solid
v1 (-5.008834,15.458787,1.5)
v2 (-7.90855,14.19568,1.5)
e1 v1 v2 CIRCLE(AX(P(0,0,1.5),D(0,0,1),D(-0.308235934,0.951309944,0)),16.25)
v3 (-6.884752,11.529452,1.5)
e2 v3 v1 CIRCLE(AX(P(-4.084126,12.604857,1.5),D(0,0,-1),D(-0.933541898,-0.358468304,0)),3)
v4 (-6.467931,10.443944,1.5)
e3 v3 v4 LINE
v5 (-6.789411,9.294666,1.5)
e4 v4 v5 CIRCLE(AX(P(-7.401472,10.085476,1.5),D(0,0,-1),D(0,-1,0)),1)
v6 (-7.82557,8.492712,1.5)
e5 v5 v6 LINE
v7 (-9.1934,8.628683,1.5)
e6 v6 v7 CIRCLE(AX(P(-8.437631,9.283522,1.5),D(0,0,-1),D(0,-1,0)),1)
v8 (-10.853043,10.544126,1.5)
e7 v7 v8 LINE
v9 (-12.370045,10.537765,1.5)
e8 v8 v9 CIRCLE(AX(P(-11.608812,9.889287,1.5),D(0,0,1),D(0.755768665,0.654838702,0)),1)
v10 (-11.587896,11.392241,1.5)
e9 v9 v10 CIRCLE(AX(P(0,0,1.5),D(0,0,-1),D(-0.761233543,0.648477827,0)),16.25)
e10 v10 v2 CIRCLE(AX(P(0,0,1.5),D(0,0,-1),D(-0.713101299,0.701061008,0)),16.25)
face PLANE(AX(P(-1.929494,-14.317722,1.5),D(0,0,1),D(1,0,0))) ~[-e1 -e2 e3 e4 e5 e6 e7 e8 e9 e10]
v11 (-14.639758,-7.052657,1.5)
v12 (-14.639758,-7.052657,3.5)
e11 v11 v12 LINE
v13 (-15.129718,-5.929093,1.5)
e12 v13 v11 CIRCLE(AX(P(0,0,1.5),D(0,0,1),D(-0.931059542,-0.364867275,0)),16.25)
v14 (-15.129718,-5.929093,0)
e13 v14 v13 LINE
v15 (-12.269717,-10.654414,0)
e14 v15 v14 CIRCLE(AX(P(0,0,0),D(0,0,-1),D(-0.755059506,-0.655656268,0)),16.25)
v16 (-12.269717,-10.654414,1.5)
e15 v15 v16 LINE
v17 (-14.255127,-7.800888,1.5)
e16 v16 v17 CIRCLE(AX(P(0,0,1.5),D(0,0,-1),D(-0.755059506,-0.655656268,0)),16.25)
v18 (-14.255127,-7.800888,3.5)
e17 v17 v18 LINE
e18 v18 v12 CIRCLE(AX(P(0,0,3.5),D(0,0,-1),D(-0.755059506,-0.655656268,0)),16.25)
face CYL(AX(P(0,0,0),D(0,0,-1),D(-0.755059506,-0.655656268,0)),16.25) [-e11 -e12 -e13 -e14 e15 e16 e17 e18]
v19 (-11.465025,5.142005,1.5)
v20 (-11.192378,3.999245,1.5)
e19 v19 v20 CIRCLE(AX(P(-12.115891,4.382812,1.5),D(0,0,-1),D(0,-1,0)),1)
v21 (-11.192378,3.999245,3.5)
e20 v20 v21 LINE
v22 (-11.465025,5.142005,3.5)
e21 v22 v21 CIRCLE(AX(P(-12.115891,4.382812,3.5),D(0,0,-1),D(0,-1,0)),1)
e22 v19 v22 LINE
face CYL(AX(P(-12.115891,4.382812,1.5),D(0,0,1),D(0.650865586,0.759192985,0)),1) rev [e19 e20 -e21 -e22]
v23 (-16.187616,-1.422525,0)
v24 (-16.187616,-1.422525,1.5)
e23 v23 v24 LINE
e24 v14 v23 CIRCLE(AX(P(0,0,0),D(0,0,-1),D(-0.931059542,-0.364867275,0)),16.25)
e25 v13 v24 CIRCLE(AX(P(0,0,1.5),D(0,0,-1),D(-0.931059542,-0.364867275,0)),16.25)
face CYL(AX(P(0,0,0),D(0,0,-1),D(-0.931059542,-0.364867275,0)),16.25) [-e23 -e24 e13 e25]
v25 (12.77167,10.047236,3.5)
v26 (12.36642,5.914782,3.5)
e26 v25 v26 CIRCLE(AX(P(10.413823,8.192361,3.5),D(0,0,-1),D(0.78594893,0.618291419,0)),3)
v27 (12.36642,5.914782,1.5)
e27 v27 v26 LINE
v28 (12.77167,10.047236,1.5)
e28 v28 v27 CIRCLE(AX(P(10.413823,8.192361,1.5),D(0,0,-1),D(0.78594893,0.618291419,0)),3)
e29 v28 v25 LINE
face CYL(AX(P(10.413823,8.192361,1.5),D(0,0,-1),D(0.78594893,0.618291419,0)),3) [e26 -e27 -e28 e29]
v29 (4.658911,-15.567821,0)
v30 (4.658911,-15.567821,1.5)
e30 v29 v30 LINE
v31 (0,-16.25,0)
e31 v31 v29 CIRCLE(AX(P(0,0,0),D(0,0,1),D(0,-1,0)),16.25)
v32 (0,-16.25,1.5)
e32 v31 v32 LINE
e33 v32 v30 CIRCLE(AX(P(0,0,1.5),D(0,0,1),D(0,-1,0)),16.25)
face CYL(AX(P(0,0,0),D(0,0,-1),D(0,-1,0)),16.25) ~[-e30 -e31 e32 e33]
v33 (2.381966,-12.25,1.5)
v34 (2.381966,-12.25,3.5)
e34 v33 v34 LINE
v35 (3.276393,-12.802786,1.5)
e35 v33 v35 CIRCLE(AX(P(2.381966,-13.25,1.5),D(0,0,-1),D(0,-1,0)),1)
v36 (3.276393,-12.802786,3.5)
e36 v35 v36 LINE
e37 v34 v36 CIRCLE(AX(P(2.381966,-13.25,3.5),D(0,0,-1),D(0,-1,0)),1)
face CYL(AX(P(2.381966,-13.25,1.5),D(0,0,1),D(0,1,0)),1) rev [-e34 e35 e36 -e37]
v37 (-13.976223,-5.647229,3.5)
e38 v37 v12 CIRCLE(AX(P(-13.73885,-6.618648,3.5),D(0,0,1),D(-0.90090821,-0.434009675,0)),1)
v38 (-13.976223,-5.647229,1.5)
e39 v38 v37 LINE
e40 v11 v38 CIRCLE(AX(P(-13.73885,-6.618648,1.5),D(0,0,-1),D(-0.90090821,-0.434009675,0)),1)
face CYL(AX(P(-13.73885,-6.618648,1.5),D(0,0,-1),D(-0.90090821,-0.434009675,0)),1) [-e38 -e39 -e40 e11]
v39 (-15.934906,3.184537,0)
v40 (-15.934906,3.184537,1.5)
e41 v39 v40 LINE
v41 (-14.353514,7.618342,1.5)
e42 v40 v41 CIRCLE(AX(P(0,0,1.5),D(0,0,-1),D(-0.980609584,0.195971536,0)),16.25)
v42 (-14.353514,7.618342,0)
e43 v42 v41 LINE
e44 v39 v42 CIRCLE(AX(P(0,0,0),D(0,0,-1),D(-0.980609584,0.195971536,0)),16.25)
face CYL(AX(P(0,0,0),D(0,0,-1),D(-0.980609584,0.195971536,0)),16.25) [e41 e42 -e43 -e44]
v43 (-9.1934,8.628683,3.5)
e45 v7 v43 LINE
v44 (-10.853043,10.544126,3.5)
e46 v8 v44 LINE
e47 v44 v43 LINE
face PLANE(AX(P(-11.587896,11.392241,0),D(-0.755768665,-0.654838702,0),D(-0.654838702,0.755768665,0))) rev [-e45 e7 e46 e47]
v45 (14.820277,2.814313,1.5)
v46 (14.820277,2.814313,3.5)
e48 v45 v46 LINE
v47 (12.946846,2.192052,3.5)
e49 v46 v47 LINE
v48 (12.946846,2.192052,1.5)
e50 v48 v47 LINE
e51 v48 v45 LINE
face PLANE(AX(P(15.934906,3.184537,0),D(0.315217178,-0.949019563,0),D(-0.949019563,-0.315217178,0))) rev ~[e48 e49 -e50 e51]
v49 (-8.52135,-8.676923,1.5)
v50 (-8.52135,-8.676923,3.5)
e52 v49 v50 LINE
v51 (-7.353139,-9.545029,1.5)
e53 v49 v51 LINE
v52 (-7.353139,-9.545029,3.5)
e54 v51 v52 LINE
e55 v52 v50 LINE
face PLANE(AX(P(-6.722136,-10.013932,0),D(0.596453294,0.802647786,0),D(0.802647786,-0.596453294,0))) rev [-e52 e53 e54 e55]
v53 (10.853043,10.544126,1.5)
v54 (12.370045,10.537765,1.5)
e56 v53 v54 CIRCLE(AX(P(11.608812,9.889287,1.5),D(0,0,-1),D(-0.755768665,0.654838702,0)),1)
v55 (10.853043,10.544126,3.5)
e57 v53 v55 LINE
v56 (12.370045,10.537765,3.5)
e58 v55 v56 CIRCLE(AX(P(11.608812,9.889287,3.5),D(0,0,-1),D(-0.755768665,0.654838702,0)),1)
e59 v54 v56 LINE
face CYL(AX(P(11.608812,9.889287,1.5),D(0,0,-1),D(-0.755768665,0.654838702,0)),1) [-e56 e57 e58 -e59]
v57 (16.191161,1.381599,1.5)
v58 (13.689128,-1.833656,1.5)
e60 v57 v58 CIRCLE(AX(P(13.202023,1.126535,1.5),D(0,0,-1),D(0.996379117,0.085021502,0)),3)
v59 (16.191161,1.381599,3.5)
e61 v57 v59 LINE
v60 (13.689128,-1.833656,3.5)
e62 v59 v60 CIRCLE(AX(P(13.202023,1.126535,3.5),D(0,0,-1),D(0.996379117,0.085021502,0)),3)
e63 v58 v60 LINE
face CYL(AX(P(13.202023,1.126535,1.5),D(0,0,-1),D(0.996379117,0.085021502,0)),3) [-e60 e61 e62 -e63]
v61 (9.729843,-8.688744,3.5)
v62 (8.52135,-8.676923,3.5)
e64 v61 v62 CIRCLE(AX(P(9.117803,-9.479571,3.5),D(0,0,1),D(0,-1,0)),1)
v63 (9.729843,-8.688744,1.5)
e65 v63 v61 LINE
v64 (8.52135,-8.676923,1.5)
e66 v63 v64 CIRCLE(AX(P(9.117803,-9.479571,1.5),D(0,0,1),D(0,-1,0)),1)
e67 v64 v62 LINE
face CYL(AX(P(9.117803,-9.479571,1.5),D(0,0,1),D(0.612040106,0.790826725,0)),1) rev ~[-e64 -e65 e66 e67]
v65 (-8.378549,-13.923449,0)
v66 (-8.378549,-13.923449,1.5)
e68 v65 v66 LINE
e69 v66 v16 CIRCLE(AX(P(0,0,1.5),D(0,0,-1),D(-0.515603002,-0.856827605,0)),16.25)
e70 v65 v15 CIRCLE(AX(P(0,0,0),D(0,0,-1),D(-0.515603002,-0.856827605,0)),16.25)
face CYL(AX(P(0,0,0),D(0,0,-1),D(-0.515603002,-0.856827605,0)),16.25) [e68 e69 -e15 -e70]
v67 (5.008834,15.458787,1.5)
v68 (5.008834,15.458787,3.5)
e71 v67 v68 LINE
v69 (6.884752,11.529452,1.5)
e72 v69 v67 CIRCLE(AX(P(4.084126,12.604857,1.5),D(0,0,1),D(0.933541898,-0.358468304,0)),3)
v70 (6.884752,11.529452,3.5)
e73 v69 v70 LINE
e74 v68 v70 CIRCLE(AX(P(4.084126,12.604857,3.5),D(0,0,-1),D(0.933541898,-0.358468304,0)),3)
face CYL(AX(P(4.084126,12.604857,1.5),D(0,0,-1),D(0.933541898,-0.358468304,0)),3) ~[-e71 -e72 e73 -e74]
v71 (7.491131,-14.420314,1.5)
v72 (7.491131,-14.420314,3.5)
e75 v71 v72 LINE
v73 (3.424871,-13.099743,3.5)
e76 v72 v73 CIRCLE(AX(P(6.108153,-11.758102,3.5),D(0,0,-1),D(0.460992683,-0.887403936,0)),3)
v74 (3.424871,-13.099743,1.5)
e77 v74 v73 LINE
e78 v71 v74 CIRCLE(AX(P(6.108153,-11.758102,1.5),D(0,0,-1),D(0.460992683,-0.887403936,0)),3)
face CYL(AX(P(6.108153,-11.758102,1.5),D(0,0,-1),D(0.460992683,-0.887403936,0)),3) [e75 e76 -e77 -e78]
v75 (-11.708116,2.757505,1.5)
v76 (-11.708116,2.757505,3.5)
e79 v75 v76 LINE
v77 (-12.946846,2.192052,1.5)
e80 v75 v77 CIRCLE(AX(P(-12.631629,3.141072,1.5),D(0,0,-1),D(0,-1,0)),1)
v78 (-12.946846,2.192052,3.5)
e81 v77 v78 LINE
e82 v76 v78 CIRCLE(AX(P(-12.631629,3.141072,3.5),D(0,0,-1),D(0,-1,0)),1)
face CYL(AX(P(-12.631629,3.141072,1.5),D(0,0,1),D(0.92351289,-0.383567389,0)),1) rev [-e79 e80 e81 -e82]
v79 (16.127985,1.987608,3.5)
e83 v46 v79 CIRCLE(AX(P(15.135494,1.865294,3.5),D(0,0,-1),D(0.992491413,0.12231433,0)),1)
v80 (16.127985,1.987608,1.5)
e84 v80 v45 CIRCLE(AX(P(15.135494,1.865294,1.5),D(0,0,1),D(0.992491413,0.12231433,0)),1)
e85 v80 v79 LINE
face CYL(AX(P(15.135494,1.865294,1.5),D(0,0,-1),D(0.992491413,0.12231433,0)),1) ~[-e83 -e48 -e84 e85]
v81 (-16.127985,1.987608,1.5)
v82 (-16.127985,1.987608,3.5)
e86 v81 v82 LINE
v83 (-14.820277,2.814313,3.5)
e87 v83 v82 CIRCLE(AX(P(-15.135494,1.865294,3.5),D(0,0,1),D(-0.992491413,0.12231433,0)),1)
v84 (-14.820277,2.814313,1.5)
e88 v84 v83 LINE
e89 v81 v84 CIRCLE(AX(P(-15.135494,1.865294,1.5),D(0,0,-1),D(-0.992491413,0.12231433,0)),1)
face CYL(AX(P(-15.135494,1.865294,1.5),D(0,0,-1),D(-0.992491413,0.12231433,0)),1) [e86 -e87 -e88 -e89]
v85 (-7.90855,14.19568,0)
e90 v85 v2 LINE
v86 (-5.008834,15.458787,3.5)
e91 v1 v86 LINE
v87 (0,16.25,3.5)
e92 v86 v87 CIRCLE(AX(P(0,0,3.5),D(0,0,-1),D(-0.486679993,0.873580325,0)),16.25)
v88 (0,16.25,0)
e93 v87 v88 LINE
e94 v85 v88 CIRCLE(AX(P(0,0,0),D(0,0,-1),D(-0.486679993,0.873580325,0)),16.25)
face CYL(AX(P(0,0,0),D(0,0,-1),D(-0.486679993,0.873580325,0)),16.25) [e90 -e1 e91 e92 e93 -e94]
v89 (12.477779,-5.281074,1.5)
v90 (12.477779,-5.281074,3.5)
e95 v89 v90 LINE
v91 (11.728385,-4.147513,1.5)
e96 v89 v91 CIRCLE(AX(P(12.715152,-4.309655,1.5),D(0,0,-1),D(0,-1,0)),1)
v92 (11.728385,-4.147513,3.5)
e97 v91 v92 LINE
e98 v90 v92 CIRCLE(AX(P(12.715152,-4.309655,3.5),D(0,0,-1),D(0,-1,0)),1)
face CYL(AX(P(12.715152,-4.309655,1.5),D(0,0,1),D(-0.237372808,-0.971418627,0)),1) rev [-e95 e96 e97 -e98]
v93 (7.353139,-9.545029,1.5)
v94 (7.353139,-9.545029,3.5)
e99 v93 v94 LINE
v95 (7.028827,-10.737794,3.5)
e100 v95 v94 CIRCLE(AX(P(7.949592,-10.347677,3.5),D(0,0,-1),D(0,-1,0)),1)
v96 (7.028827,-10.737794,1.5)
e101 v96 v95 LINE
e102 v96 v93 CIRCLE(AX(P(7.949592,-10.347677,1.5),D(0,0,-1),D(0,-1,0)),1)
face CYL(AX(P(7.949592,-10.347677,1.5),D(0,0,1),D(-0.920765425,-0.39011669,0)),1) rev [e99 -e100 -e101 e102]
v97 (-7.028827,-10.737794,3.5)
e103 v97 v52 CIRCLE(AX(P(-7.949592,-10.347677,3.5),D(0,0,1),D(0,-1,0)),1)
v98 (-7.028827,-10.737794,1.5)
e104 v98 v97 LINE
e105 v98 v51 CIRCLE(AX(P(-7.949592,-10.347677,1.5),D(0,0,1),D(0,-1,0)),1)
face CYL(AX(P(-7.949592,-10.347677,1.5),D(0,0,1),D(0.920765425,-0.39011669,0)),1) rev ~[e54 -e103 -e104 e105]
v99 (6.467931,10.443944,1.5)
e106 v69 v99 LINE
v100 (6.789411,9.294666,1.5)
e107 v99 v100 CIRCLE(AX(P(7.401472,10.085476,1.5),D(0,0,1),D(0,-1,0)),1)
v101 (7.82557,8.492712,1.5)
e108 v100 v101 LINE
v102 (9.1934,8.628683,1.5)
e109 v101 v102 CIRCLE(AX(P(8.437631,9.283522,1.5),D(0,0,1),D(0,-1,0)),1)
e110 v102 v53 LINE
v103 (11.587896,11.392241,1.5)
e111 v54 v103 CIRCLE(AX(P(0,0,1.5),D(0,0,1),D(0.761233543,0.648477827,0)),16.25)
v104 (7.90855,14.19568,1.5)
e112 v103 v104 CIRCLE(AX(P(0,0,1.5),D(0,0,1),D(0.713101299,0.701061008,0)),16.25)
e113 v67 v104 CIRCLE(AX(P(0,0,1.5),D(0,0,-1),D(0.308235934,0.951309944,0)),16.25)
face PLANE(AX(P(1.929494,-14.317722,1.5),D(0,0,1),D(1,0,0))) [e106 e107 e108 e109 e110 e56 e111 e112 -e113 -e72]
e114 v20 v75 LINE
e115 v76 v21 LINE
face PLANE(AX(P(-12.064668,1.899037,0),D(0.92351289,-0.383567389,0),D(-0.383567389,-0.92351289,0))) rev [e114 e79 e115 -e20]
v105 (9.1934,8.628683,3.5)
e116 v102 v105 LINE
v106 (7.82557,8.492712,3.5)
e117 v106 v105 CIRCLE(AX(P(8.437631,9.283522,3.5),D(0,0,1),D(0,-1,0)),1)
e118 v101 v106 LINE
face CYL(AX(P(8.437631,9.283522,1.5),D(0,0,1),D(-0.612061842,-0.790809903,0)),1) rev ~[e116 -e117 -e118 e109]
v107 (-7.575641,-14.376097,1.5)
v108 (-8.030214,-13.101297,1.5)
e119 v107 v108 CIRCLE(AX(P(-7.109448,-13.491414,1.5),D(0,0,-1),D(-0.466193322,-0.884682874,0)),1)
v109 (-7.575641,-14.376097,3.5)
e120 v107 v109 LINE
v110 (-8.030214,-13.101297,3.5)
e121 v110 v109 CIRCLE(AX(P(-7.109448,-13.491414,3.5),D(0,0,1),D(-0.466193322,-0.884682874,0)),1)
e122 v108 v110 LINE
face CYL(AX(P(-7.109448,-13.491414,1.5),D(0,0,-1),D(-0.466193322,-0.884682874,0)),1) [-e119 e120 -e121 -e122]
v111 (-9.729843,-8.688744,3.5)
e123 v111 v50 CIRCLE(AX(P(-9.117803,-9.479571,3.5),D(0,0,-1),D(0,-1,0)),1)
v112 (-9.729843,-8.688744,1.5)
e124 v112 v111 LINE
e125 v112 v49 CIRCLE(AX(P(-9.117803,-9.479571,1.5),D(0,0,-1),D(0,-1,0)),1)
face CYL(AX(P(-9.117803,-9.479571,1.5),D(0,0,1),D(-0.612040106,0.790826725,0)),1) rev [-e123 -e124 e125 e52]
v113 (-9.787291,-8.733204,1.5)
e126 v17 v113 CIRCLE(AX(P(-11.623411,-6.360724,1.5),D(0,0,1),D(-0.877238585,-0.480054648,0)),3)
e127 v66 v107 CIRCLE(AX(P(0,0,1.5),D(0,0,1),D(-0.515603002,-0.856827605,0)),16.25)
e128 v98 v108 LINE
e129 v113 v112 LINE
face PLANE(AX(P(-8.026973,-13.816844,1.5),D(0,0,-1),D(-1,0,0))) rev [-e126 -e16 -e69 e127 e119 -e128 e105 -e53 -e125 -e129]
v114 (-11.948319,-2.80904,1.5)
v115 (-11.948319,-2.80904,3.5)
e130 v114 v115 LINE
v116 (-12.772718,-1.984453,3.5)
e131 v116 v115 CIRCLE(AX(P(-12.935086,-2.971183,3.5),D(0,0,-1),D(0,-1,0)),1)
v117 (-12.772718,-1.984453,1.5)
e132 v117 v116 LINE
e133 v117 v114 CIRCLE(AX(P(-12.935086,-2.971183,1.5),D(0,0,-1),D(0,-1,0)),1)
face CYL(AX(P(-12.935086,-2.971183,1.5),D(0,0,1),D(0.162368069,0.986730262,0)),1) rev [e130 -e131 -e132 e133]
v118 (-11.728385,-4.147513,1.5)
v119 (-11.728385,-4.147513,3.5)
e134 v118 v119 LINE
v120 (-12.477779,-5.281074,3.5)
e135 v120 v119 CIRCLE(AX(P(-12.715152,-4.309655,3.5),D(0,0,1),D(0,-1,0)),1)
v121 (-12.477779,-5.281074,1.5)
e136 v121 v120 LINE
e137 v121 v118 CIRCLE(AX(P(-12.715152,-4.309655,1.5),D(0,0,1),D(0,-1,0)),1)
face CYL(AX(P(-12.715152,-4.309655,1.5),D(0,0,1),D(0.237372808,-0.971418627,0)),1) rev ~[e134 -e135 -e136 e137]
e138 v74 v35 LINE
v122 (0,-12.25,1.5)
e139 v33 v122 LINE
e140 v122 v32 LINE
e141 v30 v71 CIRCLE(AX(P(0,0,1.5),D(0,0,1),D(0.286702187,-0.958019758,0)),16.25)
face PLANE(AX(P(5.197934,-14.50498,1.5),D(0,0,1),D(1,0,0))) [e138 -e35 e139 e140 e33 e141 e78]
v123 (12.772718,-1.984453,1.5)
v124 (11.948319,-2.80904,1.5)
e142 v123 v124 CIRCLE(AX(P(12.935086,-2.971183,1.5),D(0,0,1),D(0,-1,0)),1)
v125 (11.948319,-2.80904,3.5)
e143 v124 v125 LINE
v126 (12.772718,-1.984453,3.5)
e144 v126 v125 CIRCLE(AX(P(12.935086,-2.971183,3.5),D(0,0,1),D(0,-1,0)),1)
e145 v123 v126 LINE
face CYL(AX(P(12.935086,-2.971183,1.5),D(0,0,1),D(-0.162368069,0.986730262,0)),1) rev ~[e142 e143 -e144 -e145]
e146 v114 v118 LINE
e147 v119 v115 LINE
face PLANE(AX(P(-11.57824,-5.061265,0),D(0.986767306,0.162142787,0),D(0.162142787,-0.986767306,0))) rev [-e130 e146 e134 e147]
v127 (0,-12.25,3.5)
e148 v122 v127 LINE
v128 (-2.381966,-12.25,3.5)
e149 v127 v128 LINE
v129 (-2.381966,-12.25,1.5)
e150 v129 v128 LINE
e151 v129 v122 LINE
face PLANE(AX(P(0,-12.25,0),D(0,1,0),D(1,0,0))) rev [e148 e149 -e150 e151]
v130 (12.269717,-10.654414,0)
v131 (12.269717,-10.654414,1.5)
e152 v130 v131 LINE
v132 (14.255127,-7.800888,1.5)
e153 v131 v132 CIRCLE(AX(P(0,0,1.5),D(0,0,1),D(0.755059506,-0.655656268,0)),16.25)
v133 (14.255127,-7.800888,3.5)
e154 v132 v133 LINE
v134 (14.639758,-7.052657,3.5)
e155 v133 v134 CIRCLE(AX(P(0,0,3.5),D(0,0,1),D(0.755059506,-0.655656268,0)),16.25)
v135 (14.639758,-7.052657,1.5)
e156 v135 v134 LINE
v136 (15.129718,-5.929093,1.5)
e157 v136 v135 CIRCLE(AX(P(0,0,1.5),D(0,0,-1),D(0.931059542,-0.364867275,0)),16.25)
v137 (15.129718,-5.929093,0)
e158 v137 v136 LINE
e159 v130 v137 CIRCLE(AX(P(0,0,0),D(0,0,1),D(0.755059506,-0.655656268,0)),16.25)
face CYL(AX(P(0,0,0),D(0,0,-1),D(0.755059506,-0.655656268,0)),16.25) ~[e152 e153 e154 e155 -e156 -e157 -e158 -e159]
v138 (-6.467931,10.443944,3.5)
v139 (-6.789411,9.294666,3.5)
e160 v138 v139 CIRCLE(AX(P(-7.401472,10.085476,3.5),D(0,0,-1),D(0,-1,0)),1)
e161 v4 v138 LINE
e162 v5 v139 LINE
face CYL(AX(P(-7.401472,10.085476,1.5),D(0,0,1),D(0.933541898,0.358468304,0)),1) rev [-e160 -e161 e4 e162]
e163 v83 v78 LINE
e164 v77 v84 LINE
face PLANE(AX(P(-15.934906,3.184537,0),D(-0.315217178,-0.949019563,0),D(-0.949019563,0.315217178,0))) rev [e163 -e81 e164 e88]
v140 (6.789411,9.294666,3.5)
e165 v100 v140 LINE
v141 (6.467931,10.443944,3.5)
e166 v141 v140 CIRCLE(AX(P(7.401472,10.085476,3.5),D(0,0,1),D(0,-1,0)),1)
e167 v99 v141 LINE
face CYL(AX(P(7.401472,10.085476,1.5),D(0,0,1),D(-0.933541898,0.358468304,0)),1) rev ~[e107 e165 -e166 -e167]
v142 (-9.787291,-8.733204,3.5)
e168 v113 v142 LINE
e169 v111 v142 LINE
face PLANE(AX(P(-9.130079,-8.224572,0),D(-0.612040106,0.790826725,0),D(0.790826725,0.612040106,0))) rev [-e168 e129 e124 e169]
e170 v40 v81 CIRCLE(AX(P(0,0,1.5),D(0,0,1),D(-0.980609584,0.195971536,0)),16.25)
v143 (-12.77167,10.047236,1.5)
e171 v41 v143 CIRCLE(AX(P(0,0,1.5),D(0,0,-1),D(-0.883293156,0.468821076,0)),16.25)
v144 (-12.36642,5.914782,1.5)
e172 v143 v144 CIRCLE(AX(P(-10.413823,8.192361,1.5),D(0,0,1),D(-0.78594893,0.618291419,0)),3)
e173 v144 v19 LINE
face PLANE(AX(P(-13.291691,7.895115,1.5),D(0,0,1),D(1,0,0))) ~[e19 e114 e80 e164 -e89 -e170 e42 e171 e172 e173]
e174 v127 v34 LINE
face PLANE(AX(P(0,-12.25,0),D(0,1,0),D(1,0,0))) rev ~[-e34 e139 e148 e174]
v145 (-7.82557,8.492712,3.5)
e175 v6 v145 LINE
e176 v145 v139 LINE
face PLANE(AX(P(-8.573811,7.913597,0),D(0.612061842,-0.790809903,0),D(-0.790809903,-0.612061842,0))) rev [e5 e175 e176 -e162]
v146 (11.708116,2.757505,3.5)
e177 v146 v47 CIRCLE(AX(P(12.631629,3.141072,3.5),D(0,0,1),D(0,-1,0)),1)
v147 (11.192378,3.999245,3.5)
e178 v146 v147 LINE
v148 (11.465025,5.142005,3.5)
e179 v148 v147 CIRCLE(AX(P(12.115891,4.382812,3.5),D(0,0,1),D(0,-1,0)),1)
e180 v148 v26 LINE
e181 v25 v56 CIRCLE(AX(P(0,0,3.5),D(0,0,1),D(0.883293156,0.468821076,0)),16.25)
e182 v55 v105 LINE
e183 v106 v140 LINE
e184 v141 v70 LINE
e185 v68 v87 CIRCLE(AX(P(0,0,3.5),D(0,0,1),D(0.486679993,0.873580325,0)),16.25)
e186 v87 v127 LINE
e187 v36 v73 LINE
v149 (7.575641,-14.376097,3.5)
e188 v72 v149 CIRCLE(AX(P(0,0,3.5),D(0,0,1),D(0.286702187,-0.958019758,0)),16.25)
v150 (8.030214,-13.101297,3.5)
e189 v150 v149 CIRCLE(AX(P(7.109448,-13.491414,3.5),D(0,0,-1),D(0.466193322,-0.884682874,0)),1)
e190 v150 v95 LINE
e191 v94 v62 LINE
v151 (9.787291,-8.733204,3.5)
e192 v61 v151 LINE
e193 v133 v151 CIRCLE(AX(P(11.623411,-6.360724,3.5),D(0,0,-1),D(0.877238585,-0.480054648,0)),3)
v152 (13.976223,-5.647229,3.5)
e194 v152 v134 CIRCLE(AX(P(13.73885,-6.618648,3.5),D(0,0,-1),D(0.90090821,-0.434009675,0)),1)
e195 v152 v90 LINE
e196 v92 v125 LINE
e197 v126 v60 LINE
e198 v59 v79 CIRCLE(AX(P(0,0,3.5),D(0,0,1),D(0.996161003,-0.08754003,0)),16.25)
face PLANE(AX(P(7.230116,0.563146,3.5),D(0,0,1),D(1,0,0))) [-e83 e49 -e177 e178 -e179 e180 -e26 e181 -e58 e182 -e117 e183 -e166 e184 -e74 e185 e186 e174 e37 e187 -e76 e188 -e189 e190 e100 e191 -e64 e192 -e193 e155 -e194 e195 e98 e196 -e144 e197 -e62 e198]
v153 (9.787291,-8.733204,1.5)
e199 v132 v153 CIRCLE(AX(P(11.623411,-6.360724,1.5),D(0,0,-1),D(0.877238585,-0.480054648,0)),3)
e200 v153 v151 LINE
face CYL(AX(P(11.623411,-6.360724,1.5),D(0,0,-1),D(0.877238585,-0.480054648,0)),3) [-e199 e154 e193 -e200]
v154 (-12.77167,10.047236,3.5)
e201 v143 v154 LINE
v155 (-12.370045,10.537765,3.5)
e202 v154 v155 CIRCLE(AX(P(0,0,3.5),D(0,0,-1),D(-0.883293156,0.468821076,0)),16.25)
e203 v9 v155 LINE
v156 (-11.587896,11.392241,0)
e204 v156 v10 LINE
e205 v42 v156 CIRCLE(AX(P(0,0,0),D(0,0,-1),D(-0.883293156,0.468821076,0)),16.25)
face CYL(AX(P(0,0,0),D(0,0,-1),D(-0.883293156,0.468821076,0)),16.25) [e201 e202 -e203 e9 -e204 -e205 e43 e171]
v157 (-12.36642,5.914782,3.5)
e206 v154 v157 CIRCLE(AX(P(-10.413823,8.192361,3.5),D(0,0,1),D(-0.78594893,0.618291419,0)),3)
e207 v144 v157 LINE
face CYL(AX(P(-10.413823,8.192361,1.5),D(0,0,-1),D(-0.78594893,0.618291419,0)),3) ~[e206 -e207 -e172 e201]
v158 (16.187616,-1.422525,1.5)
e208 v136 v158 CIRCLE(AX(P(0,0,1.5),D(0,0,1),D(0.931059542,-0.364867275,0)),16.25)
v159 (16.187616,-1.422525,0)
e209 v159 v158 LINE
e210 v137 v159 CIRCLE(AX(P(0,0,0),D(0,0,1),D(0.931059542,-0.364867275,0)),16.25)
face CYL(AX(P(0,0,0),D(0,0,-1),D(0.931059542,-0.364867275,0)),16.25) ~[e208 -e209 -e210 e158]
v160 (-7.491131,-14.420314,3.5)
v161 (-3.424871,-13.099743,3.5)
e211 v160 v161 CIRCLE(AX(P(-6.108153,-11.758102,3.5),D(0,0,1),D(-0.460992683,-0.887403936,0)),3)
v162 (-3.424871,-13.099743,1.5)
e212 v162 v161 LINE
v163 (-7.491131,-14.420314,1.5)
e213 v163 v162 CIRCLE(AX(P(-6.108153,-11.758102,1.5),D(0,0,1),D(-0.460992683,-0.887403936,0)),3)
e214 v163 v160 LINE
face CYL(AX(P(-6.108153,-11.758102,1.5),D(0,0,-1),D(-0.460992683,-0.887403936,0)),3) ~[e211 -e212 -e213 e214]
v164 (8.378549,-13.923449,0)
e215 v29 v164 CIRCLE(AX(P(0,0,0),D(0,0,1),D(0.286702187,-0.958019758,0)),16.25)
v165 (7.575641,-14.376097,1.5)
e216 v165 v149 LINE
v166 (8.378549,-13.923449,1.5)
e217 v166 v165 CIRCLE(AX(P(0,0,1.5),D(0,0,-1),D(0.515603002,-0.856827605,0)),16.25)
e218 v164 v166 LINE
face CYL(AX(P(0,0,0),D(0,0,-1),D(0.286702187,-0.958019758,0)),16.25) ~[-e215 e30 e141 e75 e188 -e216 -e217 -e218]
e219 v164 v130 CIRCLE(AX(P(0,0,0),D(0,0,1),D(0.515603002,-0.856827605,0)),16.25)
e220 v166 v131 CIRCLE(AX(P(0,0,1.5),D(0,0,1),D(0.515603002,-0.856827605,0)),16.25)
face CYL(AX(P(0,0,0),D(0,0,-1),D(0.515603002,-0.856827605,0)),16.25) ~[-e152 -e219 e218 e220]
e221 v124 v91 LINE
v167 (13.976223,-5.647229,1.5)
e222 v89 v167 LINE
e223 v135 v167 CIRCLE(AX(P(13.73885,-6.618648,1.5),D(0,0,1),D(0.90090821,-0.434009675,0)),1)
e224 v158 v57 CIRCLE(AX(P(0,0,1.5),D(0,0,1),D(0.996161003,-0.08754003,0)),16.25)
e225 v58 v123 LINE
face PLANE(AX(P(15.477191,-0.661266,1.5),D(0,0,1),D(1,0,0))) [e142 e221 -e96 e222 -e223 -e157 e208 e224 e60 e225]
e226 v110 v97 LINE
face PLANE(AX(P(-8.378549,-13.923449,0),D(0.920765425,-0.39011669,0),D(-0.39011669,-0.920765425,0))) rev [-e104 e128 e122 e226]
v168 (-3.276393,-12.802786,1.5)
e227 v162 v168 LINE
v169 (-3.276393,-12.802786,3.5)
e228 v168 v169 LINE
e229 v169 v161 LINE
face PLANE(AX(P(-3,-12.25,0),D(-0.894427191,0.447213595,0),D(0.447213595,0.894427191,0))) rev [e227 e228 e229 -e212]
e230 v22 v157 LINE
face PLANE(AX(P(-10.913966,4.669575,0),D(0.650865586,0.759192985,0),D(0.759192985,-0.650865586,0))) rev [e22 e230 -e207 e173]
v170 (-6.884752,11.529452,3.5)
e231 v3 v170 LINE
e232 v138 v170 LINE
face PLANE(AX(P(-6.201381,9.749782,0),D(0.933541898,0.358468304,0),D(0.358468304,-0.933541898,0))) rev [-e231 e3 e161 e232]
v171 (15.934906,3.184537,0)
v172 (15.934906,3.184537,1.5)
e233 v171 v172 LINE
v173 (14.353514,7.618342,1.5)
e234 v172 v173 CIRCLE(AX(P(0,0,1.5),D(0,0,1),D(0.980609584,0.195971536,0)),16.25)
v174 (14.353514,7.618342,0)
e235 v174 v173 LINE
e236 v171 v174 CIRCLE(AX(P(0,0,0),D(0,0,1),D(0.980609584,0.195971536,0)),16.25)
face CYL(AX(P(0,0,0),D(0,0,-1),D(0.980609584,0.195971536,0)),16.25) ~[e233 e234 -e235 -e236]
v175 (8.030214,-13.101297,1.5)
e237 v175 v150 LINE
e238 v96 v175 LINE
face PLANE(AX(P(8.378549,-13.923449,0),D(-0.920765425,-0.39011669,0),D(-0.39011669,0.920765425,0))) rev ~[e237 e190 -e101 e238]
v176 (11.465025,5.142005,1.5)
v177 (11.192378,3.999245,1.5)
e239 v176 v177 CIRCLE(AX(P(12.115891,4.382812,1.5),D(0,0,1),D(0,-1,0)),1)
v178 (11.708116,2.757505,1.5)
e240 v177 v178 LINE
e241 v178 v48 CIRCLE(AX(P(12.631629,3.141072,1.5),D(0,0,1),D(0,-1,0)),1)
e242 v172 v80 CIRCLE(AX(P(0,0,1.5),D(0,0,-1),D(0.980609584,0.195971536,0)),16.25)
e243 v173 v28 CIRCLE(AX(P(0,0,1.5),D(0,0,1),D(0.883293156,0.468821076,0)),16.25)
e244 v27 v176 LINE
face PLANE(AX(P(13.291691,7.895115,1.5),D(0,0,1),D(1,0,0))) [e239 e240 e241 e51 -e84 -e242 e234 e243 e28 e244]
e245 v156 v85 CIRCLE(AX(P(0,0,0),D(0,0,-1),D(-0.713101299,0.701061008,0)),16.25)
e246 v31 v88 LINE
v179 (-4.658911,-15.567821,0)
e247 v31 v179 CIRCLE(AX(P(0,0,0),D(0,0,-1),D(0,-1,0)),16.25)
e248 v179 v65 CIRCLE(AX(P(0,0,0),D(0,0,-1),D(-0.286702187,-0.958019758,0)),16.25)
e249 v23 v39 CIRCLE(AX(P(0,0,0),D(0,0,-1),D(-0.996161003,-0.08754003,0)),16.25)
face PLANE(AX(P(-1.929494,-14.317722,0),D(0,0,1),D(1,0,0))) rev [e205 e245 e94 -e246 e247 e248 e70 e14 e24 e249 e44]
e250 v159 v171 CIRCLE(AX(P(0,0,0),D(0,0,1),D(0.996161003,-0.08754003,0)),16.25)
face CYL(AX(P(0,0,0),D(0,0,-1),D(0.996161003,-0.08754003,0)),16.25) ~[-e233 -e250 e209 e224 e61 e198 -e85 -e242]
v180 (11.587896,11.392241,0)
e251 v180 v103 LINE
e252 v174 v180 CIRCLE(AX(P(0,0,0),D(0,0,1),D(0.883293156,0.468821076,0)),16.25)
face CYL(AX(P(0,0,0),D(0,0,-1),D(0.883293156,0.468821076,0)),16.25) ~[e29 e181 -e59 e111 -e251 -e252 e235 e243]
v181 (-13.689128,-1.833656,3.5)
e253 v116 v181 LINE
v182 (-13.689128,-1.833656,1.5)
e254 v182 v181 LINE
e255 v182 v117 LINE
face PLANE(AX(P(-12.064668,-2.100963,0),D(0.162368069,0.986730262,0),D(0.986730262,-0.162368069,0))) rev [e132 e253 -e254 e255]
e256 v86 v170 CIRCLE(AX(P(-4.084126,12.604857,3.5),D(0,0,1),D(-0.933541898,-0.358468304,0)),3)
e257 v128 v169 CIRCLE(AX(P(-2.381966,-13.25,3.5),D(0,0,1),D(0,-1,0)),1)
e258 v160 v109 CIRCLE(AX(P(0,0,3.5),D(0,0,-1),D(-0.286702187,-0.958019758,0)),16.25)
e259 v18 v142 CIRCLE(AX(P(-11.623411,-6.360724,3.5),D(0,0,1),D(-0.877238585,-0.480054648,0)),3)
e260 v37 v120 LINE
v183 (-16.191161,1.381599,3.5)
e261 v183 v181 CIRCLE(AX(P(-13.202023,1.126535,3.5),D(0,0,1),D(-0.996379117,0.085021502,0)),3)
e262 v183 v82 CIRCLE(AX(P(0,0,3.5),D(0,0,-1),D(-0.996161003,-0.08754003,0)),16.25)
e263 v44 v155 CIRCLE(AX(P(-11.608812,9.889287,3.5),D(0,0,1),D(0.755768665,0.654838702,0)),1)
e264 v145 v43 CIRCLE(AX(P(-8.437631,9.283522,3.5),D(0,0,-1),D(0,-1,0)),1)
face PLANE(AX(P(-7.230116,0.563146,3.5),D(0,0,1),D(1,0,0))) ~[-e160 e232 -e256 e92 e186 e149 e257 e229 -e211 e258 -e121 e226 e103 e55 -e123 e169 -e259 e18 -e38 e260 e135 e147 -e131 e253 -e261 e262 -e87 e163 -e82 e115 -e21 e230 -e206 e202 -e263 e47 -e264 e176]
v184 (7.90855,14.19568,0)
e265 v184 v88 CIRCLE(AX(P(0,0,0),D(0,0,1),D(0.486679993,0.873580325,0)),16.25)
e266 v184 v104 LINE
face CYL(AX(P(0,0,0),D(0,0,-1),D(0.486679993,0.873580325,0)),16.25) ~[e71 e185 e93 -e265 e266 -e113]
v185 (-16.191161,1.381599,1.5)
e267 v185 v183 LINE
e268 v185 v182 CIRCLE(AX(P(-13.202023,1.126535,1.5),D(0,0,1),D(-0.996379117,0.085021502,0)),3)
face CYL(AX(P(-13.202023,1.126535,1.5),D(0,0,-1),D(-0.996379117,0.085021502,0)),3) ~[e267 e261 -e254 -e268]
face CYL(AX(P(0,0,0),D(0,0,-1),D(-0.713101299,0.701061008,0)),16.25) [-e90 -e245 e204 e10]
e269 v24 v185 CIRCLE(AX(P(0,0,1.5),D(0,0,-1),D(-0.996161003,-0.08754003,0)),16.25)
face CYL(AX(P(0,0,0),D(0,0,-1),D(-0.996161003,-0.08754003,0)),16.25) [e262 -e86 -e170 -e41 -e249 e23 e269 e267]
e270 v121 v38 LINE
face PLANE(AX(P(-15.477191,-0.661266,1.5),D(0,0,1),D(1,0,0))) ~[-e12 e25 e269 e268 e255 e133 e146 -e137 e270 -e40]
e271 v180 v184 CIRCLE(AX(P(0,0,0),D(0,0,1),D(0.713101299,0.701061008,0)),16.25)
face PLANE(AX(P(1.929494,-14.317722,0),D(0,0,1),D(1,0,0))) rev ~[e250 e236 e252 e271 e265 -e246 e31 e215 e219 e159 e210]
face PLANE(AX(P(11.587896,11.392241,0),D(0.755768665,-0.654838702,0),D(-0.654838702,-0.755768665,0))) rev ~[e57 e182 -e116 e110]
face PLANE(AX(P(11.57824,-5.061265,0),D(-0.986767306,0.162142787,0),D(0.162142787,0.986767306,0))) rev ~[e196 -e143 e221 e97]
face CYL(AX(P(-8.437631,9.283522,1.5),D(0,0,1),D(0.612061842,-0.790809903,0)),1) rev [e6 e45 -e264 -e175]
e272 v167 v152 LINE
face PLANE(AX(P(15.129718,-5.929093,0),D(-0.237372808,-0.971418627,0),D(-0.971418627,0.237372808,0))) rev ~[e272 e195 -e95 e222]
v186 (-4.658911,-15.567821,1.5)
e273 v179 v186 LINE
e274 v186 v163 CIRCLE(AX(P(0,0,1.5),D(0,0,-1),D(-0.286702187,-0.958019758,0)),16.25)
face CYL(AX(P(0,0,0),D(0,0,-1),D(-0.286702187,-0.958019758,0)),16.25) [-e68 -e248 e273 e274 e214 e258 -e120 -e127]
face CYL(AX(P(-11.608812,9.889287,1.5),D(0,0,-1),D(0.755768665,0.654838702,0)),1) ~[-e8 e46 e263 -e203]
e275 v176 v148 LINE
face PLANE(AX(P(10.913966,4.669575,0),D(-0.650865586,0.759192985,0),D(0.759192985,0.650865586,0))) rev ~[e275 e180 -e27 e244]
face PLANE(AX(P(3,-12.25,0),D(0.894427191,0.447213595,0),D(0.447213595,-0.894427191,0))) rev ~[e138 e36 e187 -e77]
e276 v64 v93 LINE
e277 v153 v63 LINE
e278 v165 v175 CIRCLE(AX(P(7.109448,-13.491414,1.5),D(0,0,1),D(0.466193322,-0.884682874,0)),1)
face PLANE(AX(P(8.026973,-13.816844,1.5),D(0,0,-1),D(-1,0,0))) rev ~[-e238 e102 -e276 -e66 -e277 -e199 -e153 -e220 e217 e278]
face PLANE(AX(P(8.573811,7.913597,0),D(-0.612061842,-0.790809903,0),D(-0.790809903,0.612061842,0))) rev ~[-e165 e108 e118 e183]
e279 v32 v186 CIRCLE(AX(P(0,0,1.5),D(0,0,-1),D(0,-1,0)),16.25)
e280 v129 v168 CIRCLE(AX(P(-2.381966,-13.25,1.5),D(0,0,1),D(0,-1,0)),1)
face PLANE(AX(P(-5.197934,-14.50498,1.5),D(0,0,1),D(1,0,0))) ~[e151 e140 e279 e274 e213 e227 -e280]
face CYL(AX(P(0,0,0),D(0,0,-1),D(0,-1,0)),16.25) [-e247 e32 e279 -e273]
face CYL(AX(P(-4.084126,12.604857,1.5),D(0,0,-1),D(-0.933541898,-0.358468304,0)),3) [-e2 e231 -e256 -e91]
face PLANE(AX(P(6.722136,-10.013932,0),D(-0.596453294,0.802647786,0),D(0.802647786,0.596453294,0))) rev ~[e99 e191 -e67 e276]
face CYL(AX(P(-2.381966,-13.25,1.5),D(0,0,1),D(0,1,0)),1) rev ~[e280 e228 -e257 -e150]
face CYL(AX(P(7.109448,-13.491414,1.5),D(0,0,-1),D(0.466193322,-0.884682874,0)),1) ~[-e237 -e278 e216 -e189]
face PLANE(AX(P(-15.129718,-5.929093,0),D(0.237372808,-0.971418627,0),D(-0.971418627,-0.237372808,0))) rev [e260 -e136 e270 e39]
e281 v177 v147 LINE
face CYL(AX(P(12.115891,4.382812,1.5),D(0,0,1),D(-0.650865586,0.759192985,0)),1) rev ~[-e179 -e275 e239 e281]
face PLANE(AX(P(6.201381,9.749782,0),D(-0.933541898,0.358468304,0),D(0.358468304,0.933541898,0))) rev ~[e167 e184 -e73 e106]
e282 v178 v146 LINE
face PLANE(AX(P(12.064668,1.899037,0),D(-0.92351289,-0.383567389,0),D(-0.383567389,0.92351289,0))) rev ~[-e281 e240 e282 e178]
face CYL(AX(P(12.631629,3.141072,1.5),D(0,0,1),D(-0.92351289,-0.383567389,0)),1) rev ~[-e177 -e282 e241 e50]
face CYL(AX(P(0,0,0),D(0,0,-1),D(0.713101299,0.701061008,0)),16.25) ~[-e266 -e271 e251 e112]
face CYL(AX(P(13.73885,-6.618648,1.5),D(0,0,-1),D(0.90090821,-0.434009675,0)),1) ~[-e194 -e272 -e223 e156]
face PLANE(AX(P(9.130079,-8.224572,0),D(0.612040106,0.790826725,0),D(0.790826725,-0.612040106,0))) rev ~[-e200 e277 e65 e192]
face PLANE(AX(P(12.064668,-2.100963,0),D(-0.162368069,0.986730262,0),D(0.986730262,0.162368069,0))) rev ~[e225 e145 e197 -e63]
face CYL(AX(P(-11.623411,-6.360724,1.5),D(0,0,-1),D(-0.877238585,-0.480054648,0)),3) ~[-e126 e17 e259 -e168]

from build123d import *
from build123d import SkipClean  # not in build123d's __all__

# Parameters (mm, degrees)
F1_DEPTH    = 1.5
F2_DEPTH    = 3.5
F3_R        = 1
F4_R        = 1
F5_T1_DEPTH = 9.63963589
F5_T3_DEPTH = 10.6906794787
F5_T5_DEPTH = 9.0103178495
F5_T7_DEPTH = 9.246443515
F5_T9_DEPTH = 9.9071921997
F6_T1_DEPTH = 4.304276514
F6_T3_DEPTH = 5.0643678136
F6_T5_DEPTH = 5.03100669
F6_T7_DEPTH = 4.8959965939


# Not quite as in the source:
# - a fillet or chamfer that OpenCascade refuses, or shapes differently, is made with other operations: its cross-section is extruded or revolved along the edge and cut away or added
# - a feature names something its author has since deleted; it is built from what else it names


with BuildPart() as f1:
    # F0 (on Top) → F1 (new body)
    with BuildSketch(Plane.XY):
        with BuildLine():
            Line((0, -12.25), (0, -16.25))
            ThreePointArc((0, -16.25), (2.3542947693, -16.0785508097), (4.6589105316, -15.5678210633))
            Line((4.6589105316, -15.5678210633), (3, -12.25))
            Line((3, -12.25), (0, -12.25))
        make_face()
        with BuildLine():
            Line((3, -12.25), (4.6589105316, -15.5678210633))
            ThreePointArc((4.6589105316, -15.5678210633), (6.5703749152, -14.8624585272), (8.3785487777, -13.9234485807))
            Line((8.3785487777, -13.9234485807), (6.722135955, -10.0139320225))
            Line((6.722135955, -10.0139320225), (9.1300793123, -8.2245721403))
            Line((9.1300793123, -8.2245721403), (12.269716972, -10.6544143635))
            ThreePointArc((12.269716972, -10.6544143635), (13.901957351, -8.4141596021), (15.1297175637, -5.9290932226))
            Line((15.1297175637, -5.9290932226), (11.5782397372, -5.0612652418))
            Line((11.5782397372, -5.0612652418), (12.0646680977, -2.1009633231))
            Line((12.0646680977, -2.1009633231), (16.187616292, -1.4225254948))
            ThreePointArc((16.187616292, -1.4225254948), (16.2256082415, 0.890020895), (15.9349057476, 3.184537457))
            Line((15.9349057476, 3.184537457), (12.0646680977, 1.8990366769))
            Line((12.0646680977, 1.8990366769), (10.9139659303, 4.6695753469))
            Line((10.9139659303, 4.6695753469), (14.3535137791, 7.6183424833))
            ThreePointArc((14.3535137791, 7.6183424833), (13.1072409386, 9.6053492897), (11.5878961133, 11.3922413803))
            Line((11.5878961133, 11.3922413803), (8.5738108299, 7.9135966332))
            Line((8.5738108299, 7.9135966332), (6.2013811224, 9.7497821584))
            Line((6.2013811224, 9.7497821584), (7.9085498801, 14.1956802864))
            ThreePointArc((7.9085498801, 14.1956802864), (4.08550458, 15.7280371416), (0, 16.25))
            Line((0, 16.25), (0, -12.25))
            Line((0, -12.25), (3, -12.25))
        make_face()
        with BuildLine():
            Line((6.722135955, -10.0139320225), (8.3785487777, -13.9234485807))
            ThreePointArc((8.3785487777, -13.9234485807), (10.4527204974, -12.4419907653), (12.269716972, -10.6544143635))
            Line((12.269716972, -10.6544143635), (9.1300793123, -8.2245721403))
            Line((9.1300793123, -8.2245721403), (6.722135955, -10.0139320225))
        make_face()
        with BuildLine():
            ThreePointArc((11.5878961133, 11.3922413803), (9.8484856206, 12.9255495427), (7.9085498801, 14.1956802864))
            Line((7.9085498801, 14.1956802864), (6.2013811224, 9.7497821584))
            Line((6.2013811224, 9.7497821584), (8.5738108299, 7.9135966332))
            Line((8.5738108299, 7.9135966332), (11.5878961133, 11.3922413803))
        make_face()
        with BuildLine():
            Line((11.5782397372, -5.0612652418), (15.1297175637, -5.9290932226))
            ThreePointArc((15.1297175637, -5.9290932226), (15.8199601178, -3.7136722892), (16.187616292, -1.4225254948))
            Line((16.187616292, -1.4225254948), (12.0646680977, -2.1009633231))
            Line((12.0646680977, -2.1009633231), (11.5782397372, -5.0612652418))
        make_face()
        with BuildLine():
            ThreePointArc((15.9349057476, 3.184537457), (15.3056115889, 5.4590066762), (14.3535137791, 7.6183424833))
            Line((14.3535137791, 7.6183424833), (10.9139659303, 4.6695753469))
            Line((10.9139659303, 4.6695753469), (12.0646680977, 1.8990366769))
            Line((12.0646680977, 1.8990366769), (15.9349057476, 3.184537457))
        make_face()
    extrude(amount=F1_DEPTH)

    # F0 (on Top) → F2 (join)
    with BuildSketch(Plane.XY):
        with BuildLine():
            Line((3, -12.25), (4.6589105316, -15.5678210633))
            ThreePointArc((4.6589105316, -15.5678210633), (6.5703749152, -14.8624585272), (8.3785487777, -13.9234485807))
            Line((8.3785487777, -13.9234485807), (6.722135955, -10.0139320225))
            Line((6.722135955, -10.0139320225), (9.1300793123, -8.2245721403))
            Line((9.1300793123, -8.2245721403), (12.269716972, -10.6544143635))
            ThreePointArc((12.269716972, -10.6544143635), (13.901957351, -8.4141596021), (15.1297175637, -5.9290932226))
            Line((15.1297175637, -5.9290932226), (11.5782397372, -5.0612652418))
            Line((11.5782397372, -5.0612652418), (12.0646680977, -2.1009633231))
            Line((12.0646680977, -2.1009633231), (16.187616292, -1.4225254948))
            ThreePointArc((16.187616292, -1.4225254948), (16.2256082415, 0.890020895), (15.9349057476, 3.184537457))
            Line((15.9349057476, 3.184537457), (12.0646680977, 1.8990366769))
            Line((12.0646680977, 1.8990366769), (10.9139659303, 4.6695753469))
            Line((10.9139659303, 4.6695753469), (14.3535137791, 7.6183424833))
            ThreePointArc((14.3535137791, 7.6183424833), (13.1072409386, 9.6053492897), (11.5878961133, 11.3922413803))
            Line((11.5878961133, 11.3922413803), (8.5738108299, 7.9135966332))
            Line((8.5738108299, 7.9135966332), (6.2013811224, 9.7497821584))
            Line((6.2013811224, 9.7497821584), (7.9085498801, 14.1956802864))
            ThreePointArc((7.9085498801, 14.1956802864), (4.08550458, 15.7280371416), (0, 16.25))
            Line((0, 16.25), (0, -12.25))
            Line((0, -12.25), (3, -12.25))
        make_face()
    extrude(amount=F2_DEPTH)

    # F3
    f3_edges = [f1.edges().sort_by_distance(p)[0] for p in [
        (3, -12.25, 2.5),
        (9.130079, -8.224572, 2.5),
        (12.064668, -2.100963, 2.5),
        (10.913966, 4.669575, 2.5),
        (6.201381, 9.749782, 2.5),
    ]]
    fillet(f3_edges, radius=F3_R)

    # F4
    f4_edges = [f1.edges().sort_by_distance(p)[0] for p in [
        (12.064668, 1.899037, 2.5),
        (11.57824, -5.061265, 2.5),
        (6.722136, -10.013932, 2.5),
        (8.573811, 7.913597, 2.5),
    ]]
    fillet(f4_edges, radius=F4_R)

    # F5: fillet of radius 3 on 5 edges, made by hand

    # F5_s2 → F5_t1 (cut)
    with BuildSketch(Plane.XY.offset(1.5)):
        with BuildLine():
            ThreePointArc((7.4911310936, -14.4203139681), (5.1815062569, -14.6114030066), (3.4248714726, -13.0997429451))
            Line((3.4248714726, -13.0997429451), (4.6589105316, -15.5678210633))
            ThreePointArc((4.6589105316, -15.5678210633), (6.1020546546, -15.0607911144), (7.4911310936, -14.4203139681))
        make_face()
    extrude(amount=F5_T1_DEPTH, mode=Mode.SUBTRACT)

    # F5_s4 → F5_t3 (cut)
    with BuildSketch(Plane.XY.offset(1.5)):
        with BuildLine():
            ThreePointArc((14.2551270077, -7.800888026), (12.2362296702, -9.2974660849), (9.7872909338, -8.7332042566))
            Line((9.7872909338, -8.7332042566), (12.269716972, -10.6544143635))
            ThreePointArc((12.269716972, -10.6544143635), (13.3389463668, -9.2808948827), (14.2551270077, -7.800888026))
        make_face()
    extrude(amount=F5_T3_DEPTH, mode=Mode.SUBTRACT)

    # F5_s6 → F5_t5 (cut)
    with BuildSketch(Plane.XY.offset(1.5)):
        with BuildLine():
            ThreePointArc((16.1911606466, 1.381599405), (15.5696234502, -0.7158737175), (13.6891275029, -1.833655887))
            Line((13.6891275029, -1.833655887), (16.187616292, -1.4225254948))
            ThreePointArc((16.187616292, -1.4225254948), (16.2499870192, -0.0205396402), (16.1911606466, 1.381599405))
        make_face()
    extrude(amount=F5_T5_DEPTH, mode=Mode.SUBTRACT)

    # F5_s8 → F5_t7 (cut)
    with BuildSketch(Plane.XY.offset(1.5)):
        with BuildLine():
            ThreePointArc((12.7716701145, 10.0472355644), (13.3995013522, 7.899570062), (12.3664200817, 5.91478235))
            Line((12.3664200817, 5.91478235), (14.3535137791, 7.6183424833))
            ThreePointArc((14.3535137791, 7.6183424833), (13.6168564917, 8.8681294129), (12.7716701145, 10.0472355644))
        make_face()
    extrude(amount=F5_T7_DEPTH, mode=Mode.SUBTRACT)

    # F5_s10 → F5_t9 (cut)
    with BuildSketch(Plane.XY.offset(1.5)):
        with BuildLine():
            ThreePointArc((6.8847518154, 11.529451843), (6.7914209513, 13.8973561582), (5.0088339231, 15.4587865866))
            ThreePointArc((5.0088339231, 15.4587865866), (6.4894961639, 14.8979508503), (7.9085498801, 14.1956802864))
            Line((7.9085498801, 14.1956802864), (6.8847518154, 11.529451843))
        make_face()
    extrude(amount=F5_T9_DEPTH, mode=Mode.SUBTRACT)

    # F6: fillet of radius 1 on 4 edges, made by hand

    # F6_s2 → F6_t1 (cut)
    with BuildSketch(Plane.XY.offset(1.5)):
        with BuildLine():
            ThreePointArc((7.5756414815, -14.3760966936), (8.0513569254, -13.827282659), (8.0302135849, -13.1012971306))
            Line((8.0302135849, -13.1012971306), (8.3785487777, -13.9234485807))
            ThreePointArc((8.3785487777, -13.9234485807), (7.9803050872, -14.1554664605), (7.5756414815, -14.3760966936))
        make_face()
    extrude(amount=F6_T1_DEPTH, mode=Mode.SUBTRACT)

    # F6_s4 → F6_t3 (cut)
    with BuildSketch(Plane.XY.offset(1.5)):
        with BuildLine():
            ThreePointArc((14.6397584076, -7.0526572132), (14.6431333932, -6.1917144023), (13.9762230064, -5.6472289111))
            Line((13.9762230064, -5.6472289111), (15.1297175637, -5.9290932226))
            ThreePointArc((15.1297175637, -5.9290932226), (14.8953356428, -6.4954966006), (14.6397584076, -7.0526572132))
        make_face()
    extrude(amount=F6_T3_DEPTH, mode=Mode.SUBTRACT)

    # F6_s6 → F6_t5 (cut)
    with BuildSketch(Plane.XY.offset(1.5)):
        with BuildLine():
            ThreePointArc((16.1279854606, 1.9876078546), (15.6698492509, 2.7105535541), (14.82027687, 2.8143130881))
            Line((14.82027687, 2.8143130881), (15.9349057476, 3.184537457))
            ThreePointArc((15.9349057476, 3.184537457), (16.0426122647, 2.5878739778), (16.1279854606, 1.9876078546))
        make_face()
    extrude(amount=F6_T5_DEPTH, mode=Mode.SUBTRACT)

    # F6_s8 → F6_t7 (cut)
    with BuildSketch(Plane.XY.offset(1.5)):
        with BuildLine():
            ThreePointArc((10.8530428687, 10.544125571), (11.613004552, 10.8892780785), (12.3700450766, 10.5377646967))
            ThreePointArc((12.3700450766, 10.5377646967), (11.9865870504, 10.9719747942), (11.5878961133, 11.3922413803))
            Line((11.5878961133, 11.3922413803), (10.8530428687, 10.544125571))
        make_face()
    extrude(amount=F6_T7_DEPTH, mode=Mode.SUBTRACT)

    # F7: F1 across face


with BuildPart() as f1_1:
    add(f1.part, clean=False)
    with SkipClean():  # cleaning this boolean's faces spoils the solid; the shape is the same uncleaned
        add(f1.part.mirror(Plane(origin=(0, 1.0780141844, 1.6932624113), x_dir=(0, -1, 0), z_dir=(-1, 0, 0))), clean=False)


solid = f1_1.part
